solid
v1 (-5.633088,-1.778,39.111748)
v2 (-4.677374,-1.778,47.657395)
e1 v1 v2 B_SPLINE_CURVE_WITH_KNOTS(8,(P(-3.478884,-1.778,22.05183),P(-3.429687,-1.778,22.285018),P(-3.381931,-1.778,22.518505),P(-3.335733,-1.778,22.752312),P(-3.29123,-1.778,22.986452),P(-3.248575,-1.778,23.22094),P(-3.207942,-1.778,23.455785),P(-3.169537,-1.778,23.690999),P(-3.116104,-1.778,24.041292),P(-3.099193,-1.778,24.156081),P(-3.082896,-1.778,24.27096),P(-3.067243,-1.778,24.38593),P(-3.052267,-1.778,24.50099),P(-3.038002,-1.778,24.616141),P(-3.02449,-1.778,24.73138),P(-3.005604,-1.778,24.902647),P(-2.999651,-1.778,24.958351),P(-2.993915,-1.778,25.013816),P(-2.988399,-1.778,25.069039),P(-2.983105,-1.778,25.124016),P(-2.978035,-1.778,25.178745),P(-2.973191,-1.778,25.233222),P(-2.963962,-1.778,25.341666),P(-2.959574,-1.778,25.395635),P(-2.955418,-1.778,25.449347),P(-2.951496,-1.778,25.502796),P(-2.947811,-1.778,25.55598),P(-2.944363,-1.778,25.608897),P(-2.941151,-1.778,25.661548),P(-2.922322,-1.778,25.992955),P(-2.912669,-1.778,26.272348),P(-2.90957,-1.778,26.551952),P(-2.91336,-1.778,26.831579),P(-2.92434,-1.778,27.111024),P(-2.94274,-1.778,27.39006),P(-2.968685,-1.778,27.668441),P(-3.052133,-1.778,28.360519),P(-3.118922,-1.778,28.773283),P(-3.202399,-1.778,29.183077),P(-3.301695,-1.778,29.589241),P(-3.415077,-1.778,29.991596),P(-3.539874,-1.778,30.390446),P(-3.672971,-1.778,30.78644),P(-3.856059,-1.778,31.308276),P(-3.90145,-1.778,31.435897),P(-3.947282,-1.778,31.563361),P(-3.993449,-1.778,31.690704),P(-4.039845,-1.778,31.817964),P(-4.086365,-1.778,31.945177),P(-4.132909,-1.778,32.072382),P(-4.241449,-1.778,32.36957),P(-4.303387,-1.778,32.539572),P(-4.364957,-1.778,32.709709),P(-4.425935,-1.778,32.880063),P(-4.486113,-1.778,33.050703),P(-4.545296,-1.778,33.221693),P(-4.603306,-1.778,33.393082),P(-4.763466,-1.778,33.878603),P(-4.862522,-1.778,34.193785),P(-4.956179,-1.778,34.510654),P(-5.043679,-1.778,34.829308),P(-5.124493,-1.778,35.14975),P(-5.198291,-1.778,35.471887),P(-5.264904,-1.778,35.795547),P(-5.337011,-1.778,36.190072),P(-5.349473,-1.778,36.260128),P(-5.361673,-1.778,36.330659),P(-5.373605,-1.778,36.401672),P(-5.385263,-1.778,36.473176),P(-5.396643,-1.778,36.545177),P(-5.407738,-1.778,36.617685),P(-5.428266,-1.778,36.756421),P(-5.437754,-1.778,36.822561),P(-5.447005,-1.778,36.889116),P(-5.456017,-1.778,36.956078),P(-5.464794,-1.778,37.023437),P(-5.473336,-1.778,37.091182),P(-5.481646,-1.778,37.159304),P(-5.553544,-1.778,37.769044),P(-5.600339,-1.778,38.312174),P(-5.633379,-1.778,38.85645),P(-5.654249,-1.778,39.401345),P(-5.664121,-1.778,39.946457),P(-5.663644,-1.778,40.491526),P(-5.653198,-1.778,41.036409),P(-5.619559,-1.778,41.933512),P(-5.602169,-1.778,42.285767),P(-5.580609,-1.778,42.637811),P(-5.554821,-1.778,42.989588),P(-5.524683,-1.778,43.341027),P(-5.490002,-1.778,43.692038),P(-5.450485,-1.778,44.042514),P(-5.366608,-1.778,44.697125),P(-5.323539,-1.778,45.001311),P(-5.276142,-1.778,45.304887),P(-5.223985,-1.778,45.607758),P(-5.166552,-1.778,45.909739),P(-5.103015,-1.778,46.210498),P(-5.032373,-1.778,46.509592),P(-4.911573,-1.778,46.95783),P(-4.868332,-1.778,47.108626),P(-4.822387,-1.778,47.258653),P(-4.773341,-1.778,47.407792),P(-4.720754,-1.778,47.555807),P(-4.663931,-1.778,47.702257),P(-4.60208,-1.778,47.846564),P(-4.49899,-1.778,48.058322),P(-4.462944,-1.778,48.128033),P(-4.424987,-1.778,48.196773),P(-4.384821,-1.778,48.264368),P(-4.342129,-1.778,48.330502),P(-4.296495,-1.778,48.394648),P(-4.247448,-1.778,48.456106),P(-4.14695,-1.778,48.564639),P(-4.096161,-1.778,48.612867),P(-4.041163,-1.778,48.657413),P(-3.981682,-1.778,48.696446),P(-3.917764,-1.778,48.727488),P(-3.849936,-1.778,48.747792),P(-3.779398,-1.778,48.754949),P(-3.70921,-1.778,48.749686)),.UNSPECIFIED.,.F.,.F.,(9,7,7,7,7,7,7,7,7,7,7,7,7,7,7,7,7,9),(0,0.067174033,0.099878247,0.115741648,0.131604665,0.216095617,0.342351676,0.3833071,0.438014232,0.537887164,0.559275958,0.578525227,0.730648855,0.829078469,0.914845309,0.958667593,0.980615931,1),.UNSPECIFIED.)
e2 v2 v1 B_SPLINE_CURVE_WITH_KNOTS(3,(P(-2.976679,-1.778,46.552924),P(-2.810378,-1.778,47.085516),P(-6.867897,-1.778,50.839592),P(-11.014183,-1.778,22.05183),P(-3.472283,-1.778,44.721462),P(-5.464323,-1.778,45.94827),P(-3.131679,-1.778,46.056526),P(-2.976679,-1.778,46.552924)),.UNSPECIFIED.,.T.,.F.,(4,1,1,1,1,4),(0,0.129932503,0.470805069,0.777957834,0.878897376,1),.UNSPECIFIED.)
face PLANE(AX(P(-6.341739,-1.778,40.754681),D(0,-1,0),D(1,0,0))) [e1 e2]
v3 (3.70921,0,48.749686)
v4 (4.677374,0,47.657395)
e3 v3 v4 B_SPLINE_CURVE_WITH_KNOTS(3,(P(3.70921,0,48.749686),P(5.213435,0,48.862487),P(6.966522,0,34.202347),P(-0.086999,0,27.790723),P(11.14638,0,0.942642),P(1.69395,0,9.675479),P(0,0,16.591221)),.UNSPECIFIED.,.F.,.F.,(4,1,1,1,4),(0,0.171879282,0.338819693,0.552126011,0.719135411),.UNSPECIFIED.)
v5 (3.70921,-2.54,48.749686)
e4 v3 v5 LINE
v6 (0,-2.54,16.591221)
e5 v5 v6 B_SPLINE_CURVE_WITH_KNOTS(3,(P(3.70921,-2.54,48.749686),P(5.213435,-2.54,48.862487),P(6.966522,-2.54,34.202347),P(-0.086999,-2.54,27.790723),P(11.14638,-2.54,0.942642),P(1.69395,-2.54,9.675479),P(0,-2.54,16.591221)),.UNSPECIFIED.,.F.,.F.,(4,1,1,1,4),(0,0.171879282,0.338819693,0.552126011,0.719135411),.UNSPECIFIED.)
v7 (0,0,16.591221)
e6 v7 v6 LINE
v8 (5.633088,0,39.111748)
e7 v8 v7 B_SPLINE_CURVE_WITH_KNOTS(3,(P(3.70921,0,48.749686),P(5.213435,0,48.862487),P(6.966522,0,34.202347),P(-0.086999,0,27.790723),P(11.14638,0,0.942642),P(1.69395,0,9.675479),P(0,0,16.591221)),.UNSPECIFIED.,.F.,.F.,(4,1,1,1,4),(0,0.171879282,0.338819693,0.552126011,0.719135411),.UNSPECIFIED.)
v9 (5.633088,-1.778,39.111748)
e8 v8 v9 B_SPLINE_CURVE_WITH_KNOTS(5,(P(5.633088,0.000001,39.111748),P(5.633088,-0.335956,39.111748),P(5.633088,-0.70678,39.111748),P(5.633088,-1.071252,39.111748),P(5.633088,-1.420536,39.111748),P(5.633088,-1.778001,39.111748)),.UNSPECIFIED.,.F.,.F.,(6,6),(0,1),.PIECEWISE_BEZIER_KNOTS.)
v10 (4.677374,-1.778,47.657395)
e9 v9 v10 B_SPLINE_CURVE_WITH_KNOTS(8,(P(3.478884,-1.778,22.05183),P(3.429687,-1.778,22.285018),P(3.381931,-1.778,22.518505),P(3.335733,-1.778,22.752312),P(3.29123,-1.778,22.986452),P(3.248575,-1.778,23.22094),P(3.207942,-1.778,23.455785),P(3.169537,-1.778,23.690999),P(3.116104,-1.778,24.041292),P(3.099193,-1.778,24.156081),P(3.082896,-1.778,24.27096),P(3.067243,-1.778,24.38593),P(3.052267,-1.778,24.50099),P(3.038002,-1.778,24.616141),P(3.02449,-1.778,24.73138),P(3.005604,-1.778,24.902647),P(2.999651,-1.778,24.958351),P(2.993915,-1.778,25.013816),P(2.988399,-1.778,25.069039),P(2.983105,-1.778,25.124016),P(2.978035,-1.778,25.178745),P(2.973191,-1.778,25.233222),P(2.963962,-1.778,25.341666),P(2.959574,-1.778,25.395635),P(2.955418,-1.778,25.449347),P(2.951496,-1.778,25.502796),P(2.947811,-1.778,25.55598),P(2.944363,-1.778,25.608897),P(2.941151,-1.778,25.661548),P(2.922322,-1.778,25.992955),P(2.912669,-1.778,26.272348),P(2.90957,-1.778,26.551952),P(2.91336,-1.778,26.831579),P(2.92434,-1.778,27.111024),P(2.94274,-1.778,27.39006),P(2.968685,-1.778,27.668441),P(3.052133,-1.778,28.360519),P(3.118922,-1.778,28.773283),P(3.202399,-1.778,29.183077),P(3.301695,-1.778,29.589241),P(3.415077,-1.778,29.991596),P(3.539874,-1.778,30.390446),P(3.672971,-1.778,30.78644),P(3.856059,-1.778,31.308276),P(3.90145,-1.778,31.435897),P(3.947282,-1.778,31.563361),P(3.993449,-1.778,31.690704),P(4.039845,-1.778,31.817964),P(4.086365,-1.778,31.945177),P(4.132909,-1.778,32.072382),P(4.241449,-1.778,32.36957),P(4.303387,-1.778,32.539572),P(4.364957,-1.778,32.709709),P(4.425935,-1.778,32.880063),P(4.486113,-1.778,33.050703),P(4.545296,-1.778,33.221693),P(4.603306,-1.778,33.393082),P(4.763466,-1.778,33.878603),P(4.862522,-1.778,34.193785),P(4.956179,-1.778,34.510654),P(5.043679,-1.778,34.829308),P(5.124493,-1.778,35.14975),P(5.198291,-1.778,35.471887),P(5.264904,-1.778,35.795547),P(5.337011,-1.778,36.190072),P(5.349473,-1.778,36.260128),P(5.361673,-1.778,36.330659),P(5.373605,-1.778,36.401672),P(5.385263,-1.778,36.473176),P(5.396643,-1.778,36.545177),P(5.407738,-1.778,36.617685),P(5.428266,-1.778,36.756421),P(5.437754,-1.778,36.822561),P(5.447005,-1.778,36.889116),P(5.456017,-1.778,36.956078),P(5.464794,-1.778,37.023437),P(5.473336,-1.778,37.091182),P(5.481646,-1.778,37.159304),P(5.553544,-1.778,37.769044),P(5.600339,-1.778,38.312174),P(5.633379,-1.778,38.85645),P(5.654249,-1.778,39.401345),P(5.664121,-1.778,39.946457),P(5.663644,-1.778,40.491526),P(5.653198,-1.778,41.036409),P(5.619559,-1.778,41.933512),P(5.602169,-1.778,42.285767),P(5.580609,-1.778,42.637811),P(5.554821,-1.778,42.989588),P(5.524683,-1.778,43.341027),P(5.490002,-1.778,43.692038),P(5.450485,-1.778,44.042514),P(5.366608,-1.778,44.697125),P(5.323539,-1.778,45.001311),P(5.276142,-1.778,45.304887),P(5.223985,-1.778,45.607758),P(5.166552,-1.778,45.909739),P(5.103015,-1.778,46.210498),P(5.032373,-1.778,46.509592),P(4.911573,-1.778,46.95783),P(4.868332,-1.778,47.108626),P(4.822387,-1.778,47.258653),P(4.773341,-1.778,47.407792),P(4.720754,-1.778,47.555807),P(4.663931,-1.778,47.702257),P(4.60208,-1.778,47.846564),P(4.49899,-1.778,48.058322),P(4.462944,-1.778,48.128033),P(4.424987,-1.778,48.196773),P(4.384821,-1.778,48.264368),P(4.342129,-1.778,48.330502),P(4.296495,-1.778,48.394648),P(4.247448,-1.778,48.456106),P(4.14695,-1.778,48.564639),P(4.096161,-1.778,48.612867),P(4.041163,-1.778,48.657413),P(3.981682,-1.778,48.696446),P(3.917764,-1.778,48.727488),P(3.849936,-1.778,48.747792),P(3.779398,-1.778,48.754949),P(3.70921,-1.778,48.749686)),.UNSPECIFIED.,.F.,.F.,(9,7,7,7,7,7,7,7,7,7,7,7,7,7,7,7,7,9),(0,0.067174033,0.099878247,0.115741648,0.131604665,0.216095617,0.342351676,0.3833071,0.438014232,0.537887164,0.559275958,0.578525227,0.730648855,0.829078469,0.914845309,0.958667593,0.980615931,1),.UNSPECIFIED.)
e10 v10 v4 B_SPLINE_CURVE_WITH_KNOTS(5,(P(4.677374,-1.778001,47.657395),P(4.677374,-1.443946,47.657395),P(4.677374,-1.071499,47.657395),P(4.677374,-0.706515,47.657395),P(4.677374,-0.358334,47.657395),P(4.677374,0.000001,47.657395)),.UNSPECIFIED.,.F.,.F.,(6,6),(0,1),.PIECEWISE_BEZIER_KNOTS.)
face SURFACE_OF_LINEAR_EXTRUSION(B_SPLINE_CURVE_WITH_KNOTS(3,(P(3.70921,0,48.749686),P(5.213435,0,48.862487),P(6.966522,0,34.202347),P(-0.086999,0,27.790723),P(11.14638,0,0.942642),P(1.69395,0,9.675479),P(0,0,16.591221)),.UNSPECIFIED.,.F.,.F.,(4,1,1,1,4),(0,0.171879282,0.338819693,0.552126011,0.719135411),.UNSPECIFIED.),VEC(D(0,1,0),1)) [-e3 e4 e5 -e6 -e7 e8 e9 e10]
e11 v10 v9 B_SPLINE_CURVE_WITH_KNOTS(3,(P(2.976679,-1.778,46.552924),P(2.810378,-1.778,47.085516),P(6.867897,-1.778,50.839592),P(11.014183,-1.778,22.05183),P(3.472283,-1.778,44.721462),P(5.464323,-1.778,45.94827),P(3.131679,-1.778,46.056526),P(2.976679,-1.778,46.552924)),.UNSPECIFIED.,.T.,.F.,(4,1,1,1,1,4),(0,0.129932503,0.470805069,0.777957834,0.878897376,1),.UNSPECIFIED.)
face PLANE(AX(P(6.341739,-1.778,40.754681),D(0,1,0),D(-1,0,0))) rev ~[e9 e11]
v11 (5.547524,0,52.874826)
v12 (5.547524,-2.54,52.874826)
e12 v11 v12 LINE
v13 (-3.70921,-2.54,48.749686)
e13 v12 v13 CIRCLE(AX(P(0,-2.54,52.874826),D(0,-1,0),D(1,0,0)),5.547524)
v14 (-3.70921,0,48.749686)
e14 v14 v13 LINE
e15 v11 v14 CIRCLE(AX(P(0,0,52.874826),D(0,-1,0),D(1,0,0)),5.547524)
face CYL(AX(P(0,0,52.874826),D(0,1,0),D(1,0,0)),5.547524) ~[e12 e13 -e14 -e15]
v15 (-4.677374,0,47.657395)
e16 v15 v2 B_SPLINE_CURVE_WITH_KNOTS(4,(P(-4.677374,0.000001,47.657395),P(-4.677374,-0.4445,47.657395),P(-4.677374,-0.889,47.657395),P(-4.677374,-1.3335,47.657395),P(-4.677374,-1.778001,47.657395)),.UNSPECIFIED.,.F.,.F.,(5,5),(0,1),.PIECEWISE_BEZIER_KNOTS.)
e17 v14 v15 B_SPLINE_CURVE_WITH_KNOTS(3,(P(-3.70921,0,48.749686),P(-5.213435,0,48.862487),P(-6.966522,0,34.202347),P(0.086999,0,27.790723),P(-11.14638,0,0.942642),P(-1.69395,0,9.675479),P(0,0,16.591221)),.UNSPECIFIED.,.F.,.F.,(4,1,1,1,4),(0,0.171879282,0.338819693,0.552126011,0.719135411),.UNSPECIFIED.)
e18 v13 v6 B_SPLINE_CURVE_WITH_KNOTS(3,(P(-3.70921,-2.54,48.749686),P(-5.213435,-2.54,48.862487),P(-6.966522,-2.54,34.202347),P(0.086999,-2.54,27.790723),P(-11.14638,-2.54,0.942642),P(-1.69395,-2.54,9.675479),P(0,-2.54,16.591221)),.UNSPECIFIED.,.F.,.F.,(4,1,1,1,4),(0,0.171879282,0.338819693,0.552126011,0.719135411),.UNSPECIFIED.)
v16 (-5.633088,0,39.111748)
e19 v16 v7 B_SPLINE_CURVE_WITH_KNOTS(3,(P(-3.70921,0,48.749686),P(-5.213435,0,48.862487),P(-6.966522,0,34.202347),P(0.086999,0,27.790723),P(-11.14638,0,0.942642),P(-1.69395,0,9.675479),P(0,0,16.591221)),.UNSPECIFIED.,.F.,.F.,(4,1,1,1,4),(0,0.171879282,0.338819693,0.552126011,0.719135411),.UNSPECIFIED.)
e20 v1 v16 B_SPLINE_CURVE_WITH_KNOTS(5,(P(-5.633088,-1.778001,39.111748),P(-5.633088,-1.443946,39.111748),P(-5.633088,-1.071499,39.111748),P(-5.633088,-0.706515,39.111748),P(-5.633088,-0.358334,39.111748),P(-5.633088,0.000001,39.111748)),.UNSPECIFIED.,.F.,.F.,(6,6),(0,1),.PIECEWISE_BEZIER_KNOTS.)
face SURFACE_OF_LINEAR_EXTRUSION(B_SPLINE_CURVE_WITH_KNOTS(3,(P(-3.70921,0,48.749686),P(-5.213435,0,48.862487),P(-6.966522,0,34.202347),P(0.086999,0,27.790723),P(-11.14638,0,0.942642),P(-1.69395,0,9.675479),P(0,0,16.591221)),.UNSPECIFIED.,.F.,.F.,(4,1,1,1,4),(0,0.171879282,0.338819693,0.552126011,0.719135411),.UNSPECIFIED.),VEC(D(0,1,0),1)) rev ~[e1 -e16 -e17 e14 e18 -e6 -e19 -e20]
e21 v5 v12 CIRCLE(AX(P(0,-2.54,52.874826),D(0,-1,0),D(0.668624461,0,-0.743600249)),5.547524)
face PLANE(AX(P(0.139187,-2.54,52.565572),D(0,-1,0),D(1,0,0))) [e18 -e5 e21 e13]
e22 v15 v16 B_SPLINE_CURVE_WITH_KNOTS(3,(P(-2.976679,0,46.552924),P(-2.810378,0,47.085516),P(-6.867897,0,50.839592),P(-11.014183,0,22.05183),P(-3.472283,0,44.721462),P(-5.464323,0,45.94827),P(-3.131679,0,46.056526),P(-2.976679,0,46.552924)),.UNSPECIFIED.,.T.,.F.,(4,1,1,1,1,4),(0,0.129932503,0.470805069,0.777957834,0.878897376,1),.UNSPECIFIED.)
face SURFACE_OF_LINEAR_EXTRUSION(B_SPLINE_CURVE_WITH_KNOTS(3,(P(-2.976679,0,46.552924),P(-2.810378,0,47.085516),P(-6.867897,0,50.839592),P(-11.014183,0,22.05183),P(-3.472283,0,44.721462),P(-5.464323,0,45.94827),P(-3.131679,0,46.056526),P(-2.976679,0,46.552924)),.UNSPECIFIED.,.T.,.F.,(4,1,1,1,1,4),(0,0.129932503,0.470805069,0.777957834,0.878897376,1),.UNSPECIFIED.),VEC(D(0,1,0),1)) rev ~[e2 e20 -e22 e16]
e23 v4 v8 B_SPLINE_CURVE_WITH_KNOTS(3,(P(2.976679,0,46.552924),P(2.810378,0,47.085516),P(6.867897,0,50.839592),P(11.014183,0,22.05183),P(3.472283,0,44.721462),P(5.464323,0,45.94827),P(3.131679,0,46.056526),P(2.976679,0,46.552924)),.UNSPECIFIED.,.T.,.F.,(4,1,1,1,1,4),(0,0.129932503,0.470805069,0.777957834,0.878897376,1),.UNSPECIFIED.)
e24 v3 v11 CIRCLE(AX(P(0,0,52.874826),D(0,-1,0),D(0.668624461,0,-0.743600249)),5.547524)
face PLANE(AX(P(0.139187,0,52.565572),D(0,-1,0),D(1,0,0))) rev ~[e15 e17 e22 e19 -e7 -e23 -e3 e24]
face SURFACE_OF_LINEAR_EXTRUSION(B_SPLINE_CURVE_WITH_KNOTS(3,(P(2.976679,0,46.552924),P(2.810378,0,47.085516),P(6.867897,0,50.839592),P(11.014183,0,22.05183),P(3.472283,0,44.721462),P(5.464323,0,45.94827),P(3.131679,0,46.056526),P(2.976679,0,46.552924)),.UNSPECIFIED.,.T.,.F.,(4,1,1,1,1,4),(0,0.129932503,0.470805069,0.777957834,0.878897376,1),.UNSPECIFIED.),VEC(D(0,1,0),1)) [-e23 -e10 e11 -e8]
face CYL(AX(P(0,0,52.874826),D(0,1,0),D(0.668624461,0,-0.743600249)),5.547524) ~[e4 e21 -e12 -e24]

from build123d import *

# Parameters (mm, degrees)
F1_DEPTH = 2.54
F3_DEPTH = 1.778
F5_DEPTH = 3.175


with BuildPart() as f1:
    # F0 (on Front) → F1 (new body)
    with BuildSketch(Plane.XZ):
        with BuildLine():
            ThreePointArc((3.7092103529, 48.7496855453), (5.0671470477, 50.6167193556), (5.5475241636, 52.8748258948))
            ThreePointArc((5.5475241636, 52.8748258948), (-2.2581065392, 57.9419729425), (-3.7092103529, 48.7496855453))
            add(Edge.make_bspline(
                [(-2.9907241633, 48.2025038464), (-3.2397557383, 48.5425687681), (-3.4815269665, 48.7326116248), (-3.7092103529, 48.7496855453)],
                knots=[0.9739839009, 0.9739839009, 0.9739839009, 0.9739839009, 1, 1, 1, 1], degree=3))
            ThreePointArc((-2.9907241633, 48.2025038464), (0, 47.3273017313), (2.9907241633, 48.2025038464))
            add(Edge.make_bspline(
                [(2.9907241633, 48.2025038464), (3.2397557383, 48.5425687681), (3.4815269665, 48.7326116248), (3.7092103529, 48.7496855453)],
                knots=[0.9739839009, 0.9739839009, 0.9739839009, 0.9739839009, 1, 1, 1, 1], degree=3))
        make_face()
        with BuildLine():
            add(Edge.make_bspline(
                [(-2.9907241633, 48.2025038464), (-3.2397557383, 48.5425687681), (-3.4815269665, 48.7326116248), (-3.7092103529, 48.7496855453)],
                knots=[0.9739839009, 0.9739839009, 0.9739839009, 0.9739839009, 1, 1, 1, 1], degree=3))
            ThreePointArc((-3.7092103529, 48.7496855453), (-3.3611207332, 48.4614494366), (-2.9907241633, 48.2025038464))
        make_face()
        with BuildLine():
            ThreePointArc((-2.9907241633, 48.2025038464), (-3.3611207332, 48.4614494366), (-3.7092103529, 48.7496855453))
            add(Edge.make_bspline(
                [(-3.7092103529, 48.7496855453), (-5.2134349849, 48.8624869767), (-6.9665224437, 34.2023470282), (0.0869990049, 27.7907233929), (-11.1463797548, 0.9426416028), (-1.6939504177, 9.6754793133), (0, 16.5912210941)],
                knots=[0, 0, 0, 0, 0.1718792822, 0.3388196933, 0.5521260112, 0.719135411, 0.719135411, 0.719135411, 0.719135411], degree=3))
            add(Edge.make_bspline(
                [(0, 16.5912210941), (-1.4883559473, 22.6676004864), (-1.0799851415, 31.1223756669), (0, 37.8380047216)],
                knots=[0.719135411, 0.719135411, 0.719135411, 0.719135411, 0.8658749087, 0.8658749087, 0.8658749087, 0.8658749087], degree=3))
            add(Edge.make_bspline(
                [(0, 37.8380047216), (-0.7956692442, 42.7856834341), (-1.9558821397, 46.7893759257), (-2.9907241633, 48.2025038464)],
                knots=[0.8658749087, 0.8658749087, 0.8658749087, 0.8658749087, 0.9739839009, 0.9739839009, 0.9739839009, 0.9739839009], degree=3))
        make_face()
        with BuildLine():
            add(Edge.make_bspline(
                [(3.7092103529, 48.7496855453), (5.2134349849, 48.8624869767), (6.9665224437, 34.2023470282), (-0.0869990049, 27.7907233929), (11.1463797548, 0.9426416028), (1.6939504177, 9.6754793133), (0, 16.5912210941)],
                knots=[0, 0, 0, 0, 0.1718792822, 0.3388196933, 0.5521260112, 0.719135411, 0.719135411, 0.719135411, 0.719135411], degree=3))
            ThreePointArc((3.7092103529, 48.7496855453), (3.3611207332, 48.4614494366), (2.9907241633, 48.2025038464))
            add(Edge.make_bspline(
                [(0, 37.8380047216), (0.7956692442, 42.7856834341), (1.9558821397, 46.7893759257), (2.9907241633, 48.2025038464)],
                knots=[0.8658749087, 0.8658749087, 0.8658749087, 0.8658749087, 0.9739839009, 0.9739839009, 0.9739839009, 0.9739839009], degree=3))
            add(Edge.make_bspline(
                [(0, 16.5912210941), (1.4883559473, 22.6676004864), (1.0799851415, 31.1223756669), (0, 37.8380047216)],
                knots=[0.719135411, 0.719135411, 0.719135411, 0.719135411, 0.8658749087, 0.8658749087, 0.8658749087, 0.8658749087], degree=3))
        make_face()
        with BuildLine():
            ThreePointArc((2.9907241633, 48.2025038464), (3.3611207332, 48.4614494366), (3.7092103529, 48.7496855453))
            add(Edge.make_bspline(
                [(2.9907241633, 48.2025038464), (3.2397557383, 48.5425687681), (3.4815269665, 48.7326116248), (3.7092103529, 48.7496855453)],
                knots=[0.9739839009, 0.9739839009, 0.9739839009, 0.9739839009, 1, 1, 1, 1], degree=3))
        make_face()
        with BuildLine():
            ThreePointArc((2.9907241633, 48.2025038464), (0, 47.3273017313), (-2.9907241633, 48.2025038464))
            add(Edge.make_bspline(
                [(0, 37.8380047216), (-0.7956692442, 42.7856834341), (-1.9558821397, 46.7893759257), (-2.9907241633, 48.2025038464)],
                knots=[0.8658749087, 0.8658749087, 0.8658749087, 0.8658749087, 0.9739839009, 0.9739839009, 0.9739839009, 0.9739839009], degree=3))
            add(Edge.make_bspline(
                [(0, 37.8380047216), (0.7956692442, 42.7856834341), (1.9558821397, 46.7893759257), (2.9907241633, 48.2025038464)],
                knots=[0.8658749087, 0.8658749087, 0.8658749087, 0.8658749087, 0.9739839009, 0.9739839009, 0.9739839009, 0.9739839009], degree=3))
        make_face()
        with BuildLine():
            add(Edge.make_bspline(
                [(0, 16.5912210941), (-1.4883559473, 22.6676004864), (-1.0799851415, 31.1223756669), (0, 37.8380047216)],
                knots=[0.719135411, 0.719135411, 0.719135411, 0.719135411, 0.8658749087, 0.8658749087, 0.8658749087, 0.8658749087], degree=3))
            add(Edge.make_bspline(
                [(0, 16.5912210941), (1.4883559473, 22.6676004864), (1.0799851415, 31.1223756669), (0, 37.8380047216)],
                knots=[0.719135411, 0.719135411, 0.719135411, 0.719135411, 0.8658749087, 0.8658749087, 0.8658749087, 0.8658749087], degree=3))
        make_face()
    extrude(amount=F1_DEPTH)

    # F2 (on Front) → F3 (join)
    with BuildSketch(Plane.XZ):
        with BuildLine():
            add(Edge.make_bspline(
                [(-2.9766794036, 46.5529243472), (-2.81037839, 47.0855158144), (-6.8678972042, 50.8395924164), (-11.0141828945, 22.0518304425), (-3.4722826714, 44.7214617456), (-5.4643228295, 45.9482695744), (-3.1316790274, 46.0565264283), (-2.9766794036, 46.5529243472)],
                knots=[0, 0, 0, 0, 0.1299325031, 0.4708050688, 0.7779578337, 0.8788973761, 1, 1, 1, 1], degree=3))
        make_face()
        with BuildLine():
            add(Edge.make_bspline(
                [(2.9766794036, 46.5529243472), (2.81037839, 47.0855158144), (6.8678972042, 50.8395924164), (11.0141828945, 22.0518304425), (3.4722826714, 44.7214617456), (5.4643228295, 45.9482695744), (3.1316790274, 46.0565264283), (2.9766794036, 46.5529243472)],
                knots=[0, 0, 0, 0, 0.1299325031, 0.4708050688, 0.7779578337, 0.8788973761, 1, 1, 1, 1], degree=3))
        make_face()
    extrude(amount=F3_DEPTH)


with BuildPart() as f5:
    # F4 (on Front) → F5 (new body)
    with BuildSketch(Plane.XZ):
        with BuildLine():
            add(Edge.make_bspline(
                [(0, 43.0366061628), (0.8643144804, 44.4003418497), (1.6647448264, 46.9773033289), (0, 49.4899712503)],
                knots=[0.943280188, 0.943280188, 0.943280188, 0.943280188, 1, 1, 1, 1], degree=3))
            add(Edge.make_bspline(
                [(0, 43.0366061628), (-0.8643144804, 44.4003418497), (-1.6647448264, 46.9773033289), (0, 49.4899712503)],
                knots=[0.943280188, 0.943280188, 0.943280188, 0.943280188, 1, 1, 1, 1], degree=3))
        make_face()
        with BuildLine():
            add(Edge.make_bspline(
                [(0, 43.0366061628), (-0.8643144804, 44.4003418497), (-1.6647448264, 46.9773033289), (0, 49.4899712503)],
                knots=[0.943280188, 0.943280188, 0.943280188, 0.943280188, 1, 1, 1, 1], degree=3))
            add(Edge.make_bspline(
                [(0, 49.4899712503), (-2.2231687437, 52.8454913862), (-19.4626691015, 61.2857358657), (-2.5319177673, 4.3203098968), (-11.5812345835, 50.1351195221), (-3.4298269541, 14.1483642287), (-9.341972182, 49.4482532476), (-1.2007033383, 12.5482912672), (-7.9621154493, 49.231769969), (-0.0993578774, 17.6327924998), (-5.937169, 48.9375203474), (0.858972439, 16.2878370844), (-2.6565717905, 41.0508920763), (-0.6658187024, 41.9860617765), (0, 43.0366061628)],
                knots=[0, 0, 0, 0, 0.0757459709, 0.1972670057, 0.2828141129, 0.3605634713, 0.4371862329, 0.5170303649, 0.597274528, 0.6697995602, 0.7425321953, 0.8196767058, 0.8995864718, 0.943280188, 0.943280188, 0.943280188, 0.943280188], degree=3))
        make_face()
        with BuildLine():
            add(Edge.make_bspline(
                [(0, 49.4899712503), (2.2231687437, 52.8454913862), (19.4626691015, 61.2857358657), (2.5319177673, 4.3203098968), (11.5812345835, 50.1351195221), (3.4298269541, 14.1483642287), (9.341972182, 49.4482532476), (1.2007033383, 12.5482912672), (7.9621154493, 49.231769969), (0.0993578774, 17.6327924998), (5.937169, 48.9375203474), (-0.858972439, 16.2878370844), (2.6565717905, 41.0508920763), (0.6658187024, 41.9860617765), (0, 43.0366061628)],
                knots=[0, 0, 0, 0, 0.0757459709, 0.1972670057, 0.2828141129, 0.3605634713, 0.4371862329, 0.5170303649, 0.597274528, 0.6697995602, 0.7425321953, 0.8196767058, 0.8995864718, 0.943280188, 0.943280188, 0.943280188, 0.943280188], degree=3))
            add(Edge.make_bspline(
                [(0, 43.0366061628), (0.8643144804, 44.4003418497), (1.6647448264, 46.9773033289), (0, 49.4899712503)],
                knots=[0.943280188, 0.943280188, 0.943280188, 0.943280188, 1, 1, 1, 1], degree=3))
        make_face()
    extrude(amount=-F5_DEPTH)


solid = f1.part
